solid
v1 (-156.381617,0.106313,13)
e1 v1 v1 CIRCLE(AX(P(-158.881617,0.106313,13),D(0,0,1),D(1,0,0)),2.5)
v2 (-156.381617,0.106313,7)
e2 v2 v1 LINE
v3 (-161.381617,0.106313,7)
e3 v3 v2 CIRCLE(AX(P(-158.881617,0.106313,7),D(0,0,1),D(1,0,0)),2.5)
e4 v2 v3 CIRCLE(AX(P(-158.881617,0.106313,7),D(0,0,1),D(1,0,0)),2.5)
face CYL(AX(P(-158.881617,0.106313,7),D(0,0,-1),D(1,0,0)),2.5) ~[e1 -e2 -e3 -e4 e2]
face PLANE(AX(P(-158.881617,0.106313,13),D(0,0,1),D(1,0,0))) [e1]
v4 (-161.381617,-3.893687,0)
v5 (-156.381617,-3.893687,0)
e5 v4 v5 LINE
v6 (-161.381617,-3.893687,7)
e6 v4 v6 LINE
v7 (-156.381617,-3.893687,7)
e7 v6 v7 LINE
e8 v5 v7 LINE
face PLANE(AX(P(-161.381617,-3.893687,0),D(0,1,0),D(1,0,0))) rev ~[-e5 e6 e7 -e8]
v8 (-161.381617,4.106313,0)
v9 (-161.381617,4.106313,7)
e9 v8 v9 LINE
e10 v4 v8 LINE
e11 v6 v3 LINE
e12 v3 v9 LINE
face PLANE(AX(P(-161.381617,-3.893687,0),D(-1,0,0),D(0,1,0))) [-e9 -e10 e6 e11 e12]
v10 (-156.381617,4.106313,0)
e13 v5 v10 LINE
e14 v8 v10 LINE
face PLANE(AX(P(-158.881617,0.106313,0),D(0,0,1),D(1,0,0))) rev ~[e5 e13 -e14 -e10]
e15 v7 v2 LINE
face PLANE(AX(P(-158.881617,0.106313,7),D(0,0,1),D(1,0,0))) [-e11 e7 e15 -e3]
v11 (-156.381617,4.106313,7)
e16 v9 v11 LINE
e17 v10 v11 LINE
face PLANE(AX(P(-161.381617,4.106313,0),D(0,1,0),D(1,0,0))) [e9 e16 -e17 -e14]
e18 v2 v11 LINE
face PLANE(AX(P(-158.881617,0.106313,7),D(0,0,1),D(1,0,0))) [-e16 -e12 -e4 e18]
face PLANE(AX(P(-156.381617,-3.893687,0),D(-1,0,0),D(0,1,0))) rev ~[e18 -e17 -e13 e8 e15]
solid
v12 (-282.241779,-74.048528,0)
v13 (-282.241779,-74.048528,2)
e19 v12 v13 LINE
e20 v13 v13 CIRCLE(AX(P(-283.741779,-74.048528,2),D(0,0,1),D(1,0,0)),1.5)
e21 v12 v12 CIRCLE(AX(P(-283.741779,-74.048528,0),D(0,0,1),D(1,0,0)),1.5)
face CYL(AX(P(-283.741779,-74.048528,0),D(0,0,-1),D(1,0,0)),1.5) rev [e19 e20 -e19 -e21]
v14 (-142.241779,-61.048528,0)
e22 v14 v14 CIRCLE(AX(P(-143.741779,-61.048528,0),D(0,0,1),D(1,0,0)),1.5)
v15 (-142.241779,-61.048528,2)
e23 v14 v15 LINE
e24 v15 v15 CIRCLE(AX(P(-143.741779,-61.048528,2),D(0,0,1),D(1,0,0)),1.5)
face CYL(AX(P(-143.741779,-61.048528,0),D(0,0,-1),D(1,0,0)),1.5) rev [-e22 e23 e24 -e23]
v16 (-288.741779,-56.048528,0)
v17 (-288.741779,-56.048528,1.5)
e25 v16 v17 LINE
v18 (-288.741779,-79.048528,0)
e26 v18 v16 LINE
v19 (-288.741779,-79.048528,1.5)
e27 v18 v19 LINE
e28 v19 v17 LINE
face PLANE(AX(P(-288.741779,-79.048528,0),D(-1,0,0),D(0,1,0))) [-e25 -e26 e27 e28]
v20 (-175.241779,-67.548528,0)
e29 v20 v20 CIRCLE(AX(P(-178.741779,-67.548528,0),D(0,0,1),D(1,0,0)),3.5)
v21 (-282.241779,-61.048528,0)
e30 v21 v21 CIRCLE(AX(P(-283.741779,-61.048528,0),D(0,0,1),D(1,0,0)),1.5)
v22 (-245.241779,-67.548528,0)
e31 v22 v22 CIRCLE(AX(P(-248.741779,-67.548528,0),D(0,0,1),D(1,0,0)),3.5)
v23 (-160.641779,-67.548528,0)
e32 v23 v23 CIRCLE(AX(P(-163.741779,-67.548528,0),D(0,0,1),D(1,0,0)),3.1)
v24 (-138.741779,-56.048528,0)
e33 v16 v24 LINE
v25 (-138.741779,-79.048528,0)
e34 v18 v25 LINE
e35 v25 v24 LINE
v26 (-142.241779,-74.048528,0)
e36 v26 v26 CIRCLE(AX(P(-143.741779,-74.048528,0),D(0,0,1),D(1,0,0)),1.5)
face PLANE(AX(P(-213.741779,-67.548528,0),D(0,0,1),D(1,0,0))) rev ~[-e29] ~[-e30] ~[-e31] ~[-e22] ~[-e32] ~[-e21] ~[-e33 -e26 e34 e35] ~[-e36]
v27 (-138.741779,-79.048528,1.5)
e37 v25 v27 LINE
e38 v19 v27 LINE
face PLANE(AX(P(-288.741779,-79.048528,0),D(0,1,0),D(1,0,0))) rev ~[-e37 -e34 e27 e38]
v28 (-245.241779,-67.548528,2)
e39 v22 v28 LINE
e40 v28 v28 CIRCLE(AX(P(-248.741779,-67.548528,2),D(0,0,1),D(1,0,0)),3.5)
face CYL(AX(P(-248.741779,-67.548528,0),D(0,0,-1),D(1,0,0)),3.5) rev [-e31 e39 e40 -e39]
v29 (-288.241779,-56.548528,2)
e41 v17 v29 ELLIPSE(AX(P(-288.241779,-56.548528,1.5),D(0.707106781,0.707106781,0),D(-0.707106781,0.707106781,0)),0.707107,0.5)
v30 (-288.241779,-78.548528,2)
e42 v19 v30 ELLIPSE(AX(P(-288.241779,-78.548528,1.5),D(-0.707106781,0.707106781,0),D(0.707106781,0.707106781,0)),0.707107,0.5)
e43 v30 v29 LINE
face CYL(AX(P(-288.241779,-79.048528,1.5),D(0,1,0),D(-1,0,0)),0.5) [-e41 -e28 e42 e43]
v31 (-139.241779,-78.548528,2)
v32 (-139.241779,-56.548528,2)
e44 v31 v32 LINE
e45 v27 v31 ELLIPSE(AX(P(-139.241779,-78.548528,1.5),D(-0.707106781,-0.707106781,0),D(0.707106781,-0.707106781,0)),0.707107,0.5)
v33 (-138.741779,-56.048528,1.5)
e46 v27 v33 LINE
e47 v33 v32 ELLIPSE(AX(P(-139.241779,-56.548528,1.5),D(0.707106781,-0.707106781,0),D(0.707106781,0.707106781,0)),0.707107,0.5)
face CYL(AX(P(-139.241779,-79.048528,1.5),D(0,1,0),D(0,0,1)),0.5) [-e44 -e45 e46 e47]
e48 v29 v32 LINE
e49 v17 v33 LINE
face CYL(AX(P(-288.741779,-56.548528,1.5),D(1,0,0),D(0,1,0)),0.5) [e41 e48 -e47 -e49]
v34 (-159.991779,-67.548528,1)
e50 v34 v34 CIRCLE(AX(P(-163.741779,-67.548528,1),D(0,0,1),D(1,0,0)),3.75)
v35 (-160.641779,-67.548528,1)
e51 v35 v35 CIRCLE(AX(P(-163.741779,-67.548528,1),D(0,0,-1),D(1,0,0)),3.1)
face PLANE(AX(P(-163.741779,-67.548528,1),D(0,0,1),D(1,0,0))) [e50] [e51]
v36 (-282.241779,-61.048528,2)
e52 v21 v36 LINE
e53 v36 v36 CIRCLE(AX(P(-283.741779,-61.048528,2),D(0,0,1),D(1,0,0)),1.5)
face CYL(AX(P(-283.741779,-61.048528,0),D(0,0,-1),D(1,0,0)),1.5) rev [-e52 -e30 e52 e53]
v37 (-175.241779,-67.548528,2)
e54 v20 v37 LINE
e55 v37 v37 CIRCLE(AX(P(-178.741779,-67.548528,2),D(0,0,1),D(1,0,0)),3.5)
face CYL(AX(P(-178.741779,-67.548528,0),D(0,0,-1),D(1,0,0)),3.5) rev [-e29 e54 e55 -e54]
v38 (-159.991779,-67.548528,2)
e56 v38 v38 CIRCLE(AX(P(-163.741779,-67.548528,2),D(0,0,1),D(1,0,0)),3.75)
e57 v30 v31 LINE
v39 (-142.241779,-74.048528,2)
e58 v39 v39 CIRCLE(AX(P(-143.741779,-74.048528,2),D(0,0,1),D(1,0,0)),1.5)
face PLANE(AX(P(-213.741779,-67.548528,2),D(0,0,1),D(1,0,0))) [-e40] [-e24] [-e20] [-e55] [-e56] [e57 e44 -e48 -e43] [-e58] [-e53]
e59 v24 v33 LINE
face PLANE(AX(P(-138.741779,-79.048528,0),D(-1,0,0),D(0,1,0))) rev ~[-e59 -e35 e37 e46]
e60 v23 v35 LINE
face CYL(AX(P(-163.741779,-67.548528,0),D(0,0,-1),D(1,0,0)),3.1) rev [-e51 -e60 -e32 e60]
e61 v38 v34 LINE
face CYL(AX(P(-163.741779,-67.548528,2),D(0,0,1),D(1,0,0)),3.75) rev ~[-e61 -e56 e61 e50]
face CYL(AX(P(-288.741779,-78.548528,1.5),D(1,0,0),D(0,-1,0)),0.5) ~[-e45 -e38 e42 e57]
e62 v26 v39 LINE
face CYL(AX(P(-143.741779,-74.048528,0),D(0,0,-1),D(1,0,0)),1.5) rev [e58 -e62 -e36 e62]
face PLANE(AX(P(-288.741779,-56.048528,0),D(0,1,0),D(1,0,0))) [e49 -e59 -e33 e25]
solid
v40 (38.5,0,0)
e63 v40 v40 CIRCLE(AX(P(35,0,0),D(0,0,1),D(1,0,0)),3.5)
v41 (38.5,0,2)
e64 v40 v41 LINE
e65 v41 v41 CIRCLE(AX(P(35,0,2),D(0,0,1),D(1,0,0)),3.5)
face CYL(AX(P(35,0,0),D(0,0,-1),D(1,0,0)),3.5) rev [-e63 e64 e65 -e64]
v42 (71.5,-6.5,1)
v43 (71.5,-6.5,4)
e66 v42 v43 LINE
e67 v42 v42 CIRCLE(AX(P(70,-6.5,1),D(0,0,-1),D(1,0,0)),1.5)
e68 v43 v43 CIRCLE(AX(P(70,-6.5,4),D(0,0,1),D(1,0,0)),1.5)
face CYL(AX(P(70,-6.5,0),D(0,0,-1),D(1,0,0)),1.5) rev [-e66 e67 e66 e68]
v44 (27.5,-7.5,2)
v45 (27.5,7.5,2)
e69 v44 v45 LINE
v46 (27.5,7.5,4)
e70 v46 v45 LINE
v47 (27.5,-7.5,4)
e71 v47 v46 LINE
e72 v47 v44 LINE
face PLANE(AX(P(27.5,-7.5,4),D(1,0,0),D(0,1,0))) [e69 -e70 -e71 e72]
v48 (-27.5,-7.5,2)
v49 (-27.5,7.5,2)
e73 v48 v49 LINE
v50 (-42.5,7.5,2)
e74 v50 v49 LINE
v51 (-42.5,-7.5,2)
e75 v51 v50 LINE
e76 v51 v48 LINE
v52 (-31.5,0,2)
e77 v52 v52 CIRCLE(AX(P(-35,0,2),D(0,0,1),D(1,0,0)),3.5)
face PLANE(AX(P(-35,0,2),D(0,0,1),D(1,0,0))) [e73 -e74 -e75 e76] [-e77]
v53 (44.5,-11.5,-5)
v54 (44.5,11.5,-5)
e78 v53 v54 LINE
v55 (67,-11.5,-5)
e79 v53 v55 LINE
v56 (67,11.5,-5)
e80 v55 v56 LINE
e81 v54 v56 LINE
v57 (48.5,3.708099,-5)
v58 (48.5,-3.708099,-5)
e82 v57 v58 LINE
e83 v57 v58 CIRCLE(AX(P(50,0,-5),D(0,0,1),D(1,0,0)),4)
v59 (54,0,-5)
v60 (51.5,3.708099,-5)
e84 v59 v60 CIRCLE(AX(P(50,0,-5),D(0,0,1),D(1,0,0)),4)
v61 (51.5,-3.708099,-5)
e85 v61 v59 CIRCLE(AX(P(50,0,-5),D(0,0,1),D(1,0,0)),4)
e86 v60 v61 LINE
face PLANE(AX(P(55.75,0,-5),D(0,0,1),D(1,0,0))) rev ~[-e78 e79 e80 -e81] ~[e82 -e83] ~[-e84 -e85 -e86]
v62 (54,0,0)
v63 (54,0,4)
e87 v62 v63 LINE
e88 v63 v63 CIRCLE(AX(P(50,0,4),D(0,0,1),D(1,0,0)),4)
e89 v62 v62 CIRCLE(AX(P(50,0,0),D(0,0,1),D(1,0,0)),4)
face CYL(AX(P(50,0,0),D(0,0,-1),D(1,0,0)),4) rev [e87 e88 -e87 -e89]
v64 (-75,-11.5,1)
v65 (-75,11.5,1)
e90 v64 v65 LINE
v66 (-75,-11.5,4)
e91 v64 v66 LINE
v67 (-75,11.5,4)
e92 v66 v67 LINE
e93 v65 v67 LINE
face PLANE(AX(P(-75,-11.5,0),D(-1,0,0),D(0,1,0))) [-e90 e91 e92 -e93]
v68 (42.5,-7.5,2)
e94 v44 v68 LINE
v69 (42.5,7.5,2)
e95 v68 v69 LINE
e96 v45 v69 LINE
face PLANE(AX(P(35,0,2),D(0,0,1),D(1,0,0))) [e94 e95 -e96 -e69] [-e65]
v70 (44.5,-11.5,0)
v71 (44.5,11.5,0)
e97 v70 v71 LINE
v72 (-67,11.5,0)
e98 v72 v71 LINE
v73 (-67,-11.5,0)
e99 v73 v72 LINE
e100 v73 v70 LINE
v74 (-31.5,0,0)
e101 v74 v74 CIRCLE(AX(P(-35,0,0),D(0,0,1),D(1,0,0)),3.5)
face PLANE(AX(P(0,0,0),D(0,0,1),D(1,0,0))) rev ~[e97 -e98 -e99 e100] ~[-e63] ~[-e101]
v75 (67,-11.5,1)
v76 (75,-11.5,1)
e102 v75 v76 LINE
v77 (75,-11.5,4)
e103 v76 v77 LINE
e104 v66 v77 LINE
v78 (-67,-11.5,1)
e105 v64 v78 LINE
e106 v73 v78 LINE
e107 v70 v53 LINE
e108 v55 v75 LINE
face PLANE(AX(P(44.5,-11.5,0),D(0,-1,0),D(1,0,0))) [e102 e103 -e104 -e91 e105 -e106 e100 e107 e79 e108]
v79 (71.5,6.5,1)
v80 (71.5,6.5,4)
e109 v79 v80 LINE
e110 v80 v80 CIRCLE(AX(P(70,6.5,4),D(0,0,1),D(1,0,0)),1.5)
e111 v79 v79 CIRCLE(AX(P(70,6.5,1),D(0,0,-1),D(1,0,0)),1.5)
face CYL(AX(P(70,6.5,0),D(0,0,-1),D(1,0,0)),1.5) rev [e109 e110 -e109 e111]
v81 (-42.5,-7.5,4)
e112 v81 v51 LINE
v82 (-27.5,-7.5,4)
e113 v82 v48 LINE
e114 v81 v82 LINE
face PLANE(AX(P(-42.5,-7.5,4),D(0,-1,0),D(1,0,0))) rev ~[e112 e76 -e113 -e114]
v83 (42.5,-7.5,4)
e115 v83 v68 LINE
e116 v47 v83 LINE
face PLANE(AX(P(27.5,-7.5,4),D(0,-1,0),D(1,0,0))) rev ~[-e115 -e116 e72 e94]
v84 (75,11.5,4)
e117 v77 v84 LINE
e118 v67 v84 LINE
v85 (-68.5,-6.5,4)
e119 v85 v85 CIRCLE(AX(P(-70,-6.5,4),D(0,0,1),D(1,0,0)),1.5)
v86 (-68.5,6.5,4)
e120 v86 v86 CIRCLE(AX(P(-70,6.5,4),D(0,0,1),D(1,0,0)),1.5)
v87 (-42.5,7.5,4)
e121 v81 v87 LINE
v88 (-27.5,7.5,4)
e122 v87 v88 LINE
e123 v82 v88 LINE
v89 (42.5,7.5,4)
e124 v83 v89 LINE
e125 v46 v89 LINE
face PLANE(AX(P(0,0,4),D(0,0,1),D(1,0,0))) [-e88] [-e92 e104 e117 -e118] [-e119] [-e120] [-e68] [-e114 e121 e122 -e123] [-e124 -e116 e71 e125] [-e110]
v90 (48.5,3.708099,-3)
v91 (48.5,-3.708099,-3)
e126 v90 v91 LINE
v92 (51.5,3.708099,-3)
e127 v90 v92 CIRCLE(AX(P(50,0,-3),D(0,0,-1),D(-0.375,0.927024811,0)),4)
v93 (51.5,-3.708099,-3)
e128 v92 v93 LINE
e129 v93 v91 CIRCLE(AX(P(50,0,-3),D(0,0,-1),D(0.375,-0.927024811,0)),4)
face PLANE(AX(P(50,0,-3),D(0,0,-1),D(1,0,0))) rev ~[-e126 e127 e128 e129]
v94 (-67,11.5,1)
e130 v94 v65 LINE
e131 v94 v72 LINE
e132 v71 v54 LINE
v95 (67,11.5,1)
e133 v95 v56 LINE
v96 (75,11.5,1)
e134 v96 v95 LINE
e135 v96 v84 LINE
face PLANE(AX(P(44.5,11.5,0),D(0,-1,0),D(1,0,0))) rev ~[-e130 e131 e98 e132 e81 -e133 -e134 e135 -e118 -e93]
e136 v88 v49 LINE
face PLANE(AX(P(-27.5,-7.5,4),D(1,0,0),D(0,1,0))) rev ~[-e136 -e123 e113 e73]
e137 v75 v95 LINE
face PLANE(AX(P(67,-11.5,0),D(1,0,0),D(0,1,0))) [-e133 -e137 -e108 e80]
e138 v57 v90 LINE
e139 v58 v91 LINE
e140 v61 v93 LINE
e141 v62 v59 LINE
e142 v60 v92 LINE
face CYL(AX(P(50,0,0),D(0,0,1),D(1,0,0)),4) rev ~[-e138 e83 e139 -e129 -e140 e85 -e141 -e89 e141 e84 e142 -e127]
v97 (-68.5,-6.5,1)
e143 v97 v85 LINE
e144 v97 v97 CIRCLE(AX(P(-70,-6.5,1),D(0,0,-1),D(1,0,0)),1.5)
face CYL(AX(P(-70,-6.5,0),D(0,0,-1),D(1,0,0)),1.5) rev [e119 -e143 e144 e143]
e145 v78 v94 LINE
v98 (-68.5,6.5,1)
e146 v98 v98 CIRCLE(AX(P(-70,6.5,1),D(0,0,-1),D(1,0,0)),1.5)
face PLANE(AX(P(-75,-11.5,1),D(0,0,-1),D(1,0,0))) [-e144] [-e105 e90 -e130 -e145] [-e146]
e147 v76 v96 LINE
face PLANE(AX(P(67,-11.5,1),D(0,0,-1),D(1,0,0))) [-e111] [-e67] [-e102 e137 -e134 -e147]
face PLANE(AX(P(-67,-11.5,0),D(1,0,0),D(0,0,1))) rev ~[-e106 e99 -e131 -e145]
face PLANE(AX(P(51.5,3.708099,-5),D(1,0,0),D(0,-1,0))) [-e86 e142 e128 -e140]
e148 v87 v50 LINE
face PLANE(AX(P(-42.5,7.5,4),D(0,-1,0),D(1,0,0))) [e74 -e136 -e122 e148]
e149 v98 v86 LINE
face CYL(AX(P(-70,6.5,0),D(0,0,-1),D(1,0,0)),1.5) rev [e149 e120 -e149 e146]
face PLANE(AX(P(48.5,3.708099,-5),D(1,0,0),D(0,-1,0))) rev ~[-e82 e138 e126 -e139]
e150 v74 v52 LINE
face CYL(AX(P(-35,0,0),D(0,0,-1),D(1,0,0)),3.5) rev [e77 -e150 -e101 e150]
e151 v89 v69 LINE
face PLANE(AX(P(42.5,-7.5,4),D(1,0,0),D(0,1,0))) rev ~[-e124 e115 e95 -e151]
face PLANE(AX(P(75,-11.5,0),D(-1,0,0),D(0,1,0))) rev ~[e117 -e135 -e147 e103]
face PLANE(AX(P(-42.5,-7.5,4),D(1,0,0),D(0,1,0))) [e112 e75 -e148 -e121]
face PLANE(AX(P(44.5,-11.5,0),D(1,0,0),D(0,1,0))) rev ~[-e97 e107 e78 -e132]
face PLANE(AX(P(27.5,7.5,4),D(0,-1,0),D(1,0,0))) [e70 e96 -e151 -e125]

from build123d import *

# Parameters (mm, degrees)
F1_W      = 5
F1_H      = 8
F2_DEPTH  = 7
F4_DEPTH  = 6
F0_W      = 150
F0_H      = 23
F0_R      = 1.5
F0_R_2    = 3.5
F0_R_3    = 4
F5_DEPTH  = 4
F6_W      = 150
F6_H      = 23
F6_R      = 1.5
F6_R_2    = 3.5
F6_R_3    = 3.1
F7_DEPTH  = 2
F8_R      = 3.75
F9_DEPTH  = 1
F10_W     = 8
F10_H     = 1
F11_DEPTH = 30
F12_W     = 15
F12_H     = 15
F12_R     = 3.5
F13_DEPTH = 2
F14_R     = 4
F15_DEPTH = 3
F17_R     = 0.5
F16_W     = 22.5
F16_H     = 23
F16_R     = 4
F18_DEPTH = 5
F19_W     = 3
F19_H     = 7.4161984871
F20_DEPTH = 2


with BuildPart() as f2:
    # F1 (on Top) → F2 (new body)
    with BuildSketch(Plane.XY):
        with Locations((-158.8816171885, 0.1063133087)):
            Rectangle(F1_W, F1_H)
    extrude(amount=F2_DEPTH)

    # F3 (on face) → F4 (join)
    with BuildSketch(Plane.XY.offset(7)):
        with BuildLine():
            ThreePointArc((-161.3816171885, 0.1063133087), (-158.8816171885, -2.3936866913), (-156.3816171885, 0.1063133087))
            ThreePointArc((-156.3816171885, 0.1063133087), (-158.8816171885, 2.6063133087), (-161.3816171885, 0.1063133087))
        make_face()
    extrude(amount=F4_DEPTH)

    # F14 (on face) → F15 (cut)
    with BuildSketch(Plane.XY.offset(4)):
        with Locations((50, 0)):
            Circle(F14_R)
    extrude(amount=-F15_DEPTH, mode=Mode.SUBTRACT)


with BuildPart() as f5:
    # F0 (on Top) → F5 (new body)
    with BuildSketch(Plane.XY):
        Rectangle(F0_W, F0_H)
        with Locations((-70, -6.5)):
            Circle(F0_R, mode=Mode.SUBTRACT)
        with Locations((70, -6.5)):
            Circle(F0_R, mode=Mode.SUBTRACT)
        with Locations((-35, 0)):
            Circle(F0_R_2, mode=Mode.SUBTRACT)
        with Locations((-70, 6.5)):
            Circle(F0_R, mode=Mode.SUBTRACT)
        with Locations((35, 0)):
            Circle(F0_R_2, mode=Mode.SUBTRACT)
        with Locations((50, 0)):
            Circle(F0_R_3, mode=Mode.SUBTRACT)
        with Locations((70, 6.5)):
            Circle(F0_R, mode=Mode.SUBTRACT)
    extrude(amount=F5_DEPTH)

    # F10 (on face) → F11 (cut)
    with BuildSketch(Plane.XZ.offset(11.5)):
        with Locations((-71, 0.5)):
            Rectangle(F10_W, F10_H)
        with Locations((71, 0.5)):
            Rectangle(F10_W, F10_H)
    extrude(amount=-F11_DEPTH, mode=Mode.SUBTRACT)

    # F12 (on face) → F13 (cut)
    with BuildSketch(Plane.XY.offset(4)):
        with Locations((-35, 0)):
            Rectangle(F12_W, F12_H)
        with Locations((-35, 0)):
            Circle(F12_R, mode=Mode.SUBTRACT)
        with Locations((35, 0)):
            Rectangle(F12_W, F12_H)
        with Locations((35, 0)):
            Circle(F12_R, mode=Mode.SUBTRACT)
    extrude(amount=-F13_DEPTH, mode=Mode.SUBTRACT)

    # F16 (on face) → F18 (join)
    with BuildSketch(Plane.XY):
        with Locations((55.75, 0)):
            Rectangle(F16_W, F16_H)
        with Locations((50, 0)):
            Circle(F16_R, mode=Mode.SUBTRACT)
    extrude(amount=-F18_DEPTH)

    # F19 (on face) → F20 (join)
    with BuildSketch(Plane(origin=(0, 0, -5), x_dir=(1, 0, 0), z_dir=(0, 0, -1))):
        with Locations((50, 0)):
            Rectangle(F19_W, F19_H)
        with BuildLine():
            Line((48.5, 3.7080992435), (51.5, 3.7080992435))
            ThreePointArc((51.5, 3.7080992435), (50, 4), (48.5, 3.7080992435))
        make_face()
        with BuildLine():
            ThreePointArc((48.5, -3.7080992435), (50, -4), (51.5, -3.7080992435))
            Line((51.5, -3.7080992435), (48.5, -3.7080992435))
        make_face()
    extrude(amount=-F20_DEPTH)


with BuildPart() as f7:
    # F6 (on Top) → F7 (new body)
    with BuildSketch(Plane.XY):
        with Locations((-213.7417785823, -67.5485283136)):
            Rectangle(F6_W, F6_H)
        with Locations((-283.7417785823, -74.0485283136)):
            Circle(F6_R, mode=Mode.SUBTRACT)
        with Locations((-143.7417785823, -74.0485283136)):
            Circle(F6_R, mode=Mode.SUBTRACT)
        with Locations((-248.7417785823, -67.5485283136)):
            Circle(F6_R_2, mode=Mode.SUBTRACT)
        with Locations((-283.7417785823, -61.0485283136)):
            Circle(F6_R, mode=Mode.SUBTRACT)
        with Locations((-178.7417785823, -67.5485283136)):
            Circle(F6_R_2, mode=Mode.SUBTRACT)
        with Locations((-163.7417785823, -67.5485283136)):
            Circle(F6_R_3, mode=Mode.SUBTRACT)
        with Locations((-143.7417785823, -61.0485283136)):
            Circle(F6_R, mode=Mode.SUBTRACT)
    extrude(amount=F7_DEPTH)

    # F8 (on face) → F9 (cut)
    with BuildSketch(Plane.XY.offset(2)):
        with Locations((-163.7417785823, -67.5485283136)):
            Circle(F8_R)
    extrude(amount=-F9_DEPTH, mode=Mode.SUBTRACT)

    # F17
    f17_edges = [f7.edges().sort_by_distance(p)[0] for p in [
        (-288.741779, -67.548528, 2),
        (-213.741779, -56.048528, 2),
        (-213.741779, -79.048528, 2),
        (-138.741779, -67.548528, 2),
    ]]
    fillet(f17_edges, radius=F17_R)


solid = Compound([f2.part, f5.part, f7.part])
